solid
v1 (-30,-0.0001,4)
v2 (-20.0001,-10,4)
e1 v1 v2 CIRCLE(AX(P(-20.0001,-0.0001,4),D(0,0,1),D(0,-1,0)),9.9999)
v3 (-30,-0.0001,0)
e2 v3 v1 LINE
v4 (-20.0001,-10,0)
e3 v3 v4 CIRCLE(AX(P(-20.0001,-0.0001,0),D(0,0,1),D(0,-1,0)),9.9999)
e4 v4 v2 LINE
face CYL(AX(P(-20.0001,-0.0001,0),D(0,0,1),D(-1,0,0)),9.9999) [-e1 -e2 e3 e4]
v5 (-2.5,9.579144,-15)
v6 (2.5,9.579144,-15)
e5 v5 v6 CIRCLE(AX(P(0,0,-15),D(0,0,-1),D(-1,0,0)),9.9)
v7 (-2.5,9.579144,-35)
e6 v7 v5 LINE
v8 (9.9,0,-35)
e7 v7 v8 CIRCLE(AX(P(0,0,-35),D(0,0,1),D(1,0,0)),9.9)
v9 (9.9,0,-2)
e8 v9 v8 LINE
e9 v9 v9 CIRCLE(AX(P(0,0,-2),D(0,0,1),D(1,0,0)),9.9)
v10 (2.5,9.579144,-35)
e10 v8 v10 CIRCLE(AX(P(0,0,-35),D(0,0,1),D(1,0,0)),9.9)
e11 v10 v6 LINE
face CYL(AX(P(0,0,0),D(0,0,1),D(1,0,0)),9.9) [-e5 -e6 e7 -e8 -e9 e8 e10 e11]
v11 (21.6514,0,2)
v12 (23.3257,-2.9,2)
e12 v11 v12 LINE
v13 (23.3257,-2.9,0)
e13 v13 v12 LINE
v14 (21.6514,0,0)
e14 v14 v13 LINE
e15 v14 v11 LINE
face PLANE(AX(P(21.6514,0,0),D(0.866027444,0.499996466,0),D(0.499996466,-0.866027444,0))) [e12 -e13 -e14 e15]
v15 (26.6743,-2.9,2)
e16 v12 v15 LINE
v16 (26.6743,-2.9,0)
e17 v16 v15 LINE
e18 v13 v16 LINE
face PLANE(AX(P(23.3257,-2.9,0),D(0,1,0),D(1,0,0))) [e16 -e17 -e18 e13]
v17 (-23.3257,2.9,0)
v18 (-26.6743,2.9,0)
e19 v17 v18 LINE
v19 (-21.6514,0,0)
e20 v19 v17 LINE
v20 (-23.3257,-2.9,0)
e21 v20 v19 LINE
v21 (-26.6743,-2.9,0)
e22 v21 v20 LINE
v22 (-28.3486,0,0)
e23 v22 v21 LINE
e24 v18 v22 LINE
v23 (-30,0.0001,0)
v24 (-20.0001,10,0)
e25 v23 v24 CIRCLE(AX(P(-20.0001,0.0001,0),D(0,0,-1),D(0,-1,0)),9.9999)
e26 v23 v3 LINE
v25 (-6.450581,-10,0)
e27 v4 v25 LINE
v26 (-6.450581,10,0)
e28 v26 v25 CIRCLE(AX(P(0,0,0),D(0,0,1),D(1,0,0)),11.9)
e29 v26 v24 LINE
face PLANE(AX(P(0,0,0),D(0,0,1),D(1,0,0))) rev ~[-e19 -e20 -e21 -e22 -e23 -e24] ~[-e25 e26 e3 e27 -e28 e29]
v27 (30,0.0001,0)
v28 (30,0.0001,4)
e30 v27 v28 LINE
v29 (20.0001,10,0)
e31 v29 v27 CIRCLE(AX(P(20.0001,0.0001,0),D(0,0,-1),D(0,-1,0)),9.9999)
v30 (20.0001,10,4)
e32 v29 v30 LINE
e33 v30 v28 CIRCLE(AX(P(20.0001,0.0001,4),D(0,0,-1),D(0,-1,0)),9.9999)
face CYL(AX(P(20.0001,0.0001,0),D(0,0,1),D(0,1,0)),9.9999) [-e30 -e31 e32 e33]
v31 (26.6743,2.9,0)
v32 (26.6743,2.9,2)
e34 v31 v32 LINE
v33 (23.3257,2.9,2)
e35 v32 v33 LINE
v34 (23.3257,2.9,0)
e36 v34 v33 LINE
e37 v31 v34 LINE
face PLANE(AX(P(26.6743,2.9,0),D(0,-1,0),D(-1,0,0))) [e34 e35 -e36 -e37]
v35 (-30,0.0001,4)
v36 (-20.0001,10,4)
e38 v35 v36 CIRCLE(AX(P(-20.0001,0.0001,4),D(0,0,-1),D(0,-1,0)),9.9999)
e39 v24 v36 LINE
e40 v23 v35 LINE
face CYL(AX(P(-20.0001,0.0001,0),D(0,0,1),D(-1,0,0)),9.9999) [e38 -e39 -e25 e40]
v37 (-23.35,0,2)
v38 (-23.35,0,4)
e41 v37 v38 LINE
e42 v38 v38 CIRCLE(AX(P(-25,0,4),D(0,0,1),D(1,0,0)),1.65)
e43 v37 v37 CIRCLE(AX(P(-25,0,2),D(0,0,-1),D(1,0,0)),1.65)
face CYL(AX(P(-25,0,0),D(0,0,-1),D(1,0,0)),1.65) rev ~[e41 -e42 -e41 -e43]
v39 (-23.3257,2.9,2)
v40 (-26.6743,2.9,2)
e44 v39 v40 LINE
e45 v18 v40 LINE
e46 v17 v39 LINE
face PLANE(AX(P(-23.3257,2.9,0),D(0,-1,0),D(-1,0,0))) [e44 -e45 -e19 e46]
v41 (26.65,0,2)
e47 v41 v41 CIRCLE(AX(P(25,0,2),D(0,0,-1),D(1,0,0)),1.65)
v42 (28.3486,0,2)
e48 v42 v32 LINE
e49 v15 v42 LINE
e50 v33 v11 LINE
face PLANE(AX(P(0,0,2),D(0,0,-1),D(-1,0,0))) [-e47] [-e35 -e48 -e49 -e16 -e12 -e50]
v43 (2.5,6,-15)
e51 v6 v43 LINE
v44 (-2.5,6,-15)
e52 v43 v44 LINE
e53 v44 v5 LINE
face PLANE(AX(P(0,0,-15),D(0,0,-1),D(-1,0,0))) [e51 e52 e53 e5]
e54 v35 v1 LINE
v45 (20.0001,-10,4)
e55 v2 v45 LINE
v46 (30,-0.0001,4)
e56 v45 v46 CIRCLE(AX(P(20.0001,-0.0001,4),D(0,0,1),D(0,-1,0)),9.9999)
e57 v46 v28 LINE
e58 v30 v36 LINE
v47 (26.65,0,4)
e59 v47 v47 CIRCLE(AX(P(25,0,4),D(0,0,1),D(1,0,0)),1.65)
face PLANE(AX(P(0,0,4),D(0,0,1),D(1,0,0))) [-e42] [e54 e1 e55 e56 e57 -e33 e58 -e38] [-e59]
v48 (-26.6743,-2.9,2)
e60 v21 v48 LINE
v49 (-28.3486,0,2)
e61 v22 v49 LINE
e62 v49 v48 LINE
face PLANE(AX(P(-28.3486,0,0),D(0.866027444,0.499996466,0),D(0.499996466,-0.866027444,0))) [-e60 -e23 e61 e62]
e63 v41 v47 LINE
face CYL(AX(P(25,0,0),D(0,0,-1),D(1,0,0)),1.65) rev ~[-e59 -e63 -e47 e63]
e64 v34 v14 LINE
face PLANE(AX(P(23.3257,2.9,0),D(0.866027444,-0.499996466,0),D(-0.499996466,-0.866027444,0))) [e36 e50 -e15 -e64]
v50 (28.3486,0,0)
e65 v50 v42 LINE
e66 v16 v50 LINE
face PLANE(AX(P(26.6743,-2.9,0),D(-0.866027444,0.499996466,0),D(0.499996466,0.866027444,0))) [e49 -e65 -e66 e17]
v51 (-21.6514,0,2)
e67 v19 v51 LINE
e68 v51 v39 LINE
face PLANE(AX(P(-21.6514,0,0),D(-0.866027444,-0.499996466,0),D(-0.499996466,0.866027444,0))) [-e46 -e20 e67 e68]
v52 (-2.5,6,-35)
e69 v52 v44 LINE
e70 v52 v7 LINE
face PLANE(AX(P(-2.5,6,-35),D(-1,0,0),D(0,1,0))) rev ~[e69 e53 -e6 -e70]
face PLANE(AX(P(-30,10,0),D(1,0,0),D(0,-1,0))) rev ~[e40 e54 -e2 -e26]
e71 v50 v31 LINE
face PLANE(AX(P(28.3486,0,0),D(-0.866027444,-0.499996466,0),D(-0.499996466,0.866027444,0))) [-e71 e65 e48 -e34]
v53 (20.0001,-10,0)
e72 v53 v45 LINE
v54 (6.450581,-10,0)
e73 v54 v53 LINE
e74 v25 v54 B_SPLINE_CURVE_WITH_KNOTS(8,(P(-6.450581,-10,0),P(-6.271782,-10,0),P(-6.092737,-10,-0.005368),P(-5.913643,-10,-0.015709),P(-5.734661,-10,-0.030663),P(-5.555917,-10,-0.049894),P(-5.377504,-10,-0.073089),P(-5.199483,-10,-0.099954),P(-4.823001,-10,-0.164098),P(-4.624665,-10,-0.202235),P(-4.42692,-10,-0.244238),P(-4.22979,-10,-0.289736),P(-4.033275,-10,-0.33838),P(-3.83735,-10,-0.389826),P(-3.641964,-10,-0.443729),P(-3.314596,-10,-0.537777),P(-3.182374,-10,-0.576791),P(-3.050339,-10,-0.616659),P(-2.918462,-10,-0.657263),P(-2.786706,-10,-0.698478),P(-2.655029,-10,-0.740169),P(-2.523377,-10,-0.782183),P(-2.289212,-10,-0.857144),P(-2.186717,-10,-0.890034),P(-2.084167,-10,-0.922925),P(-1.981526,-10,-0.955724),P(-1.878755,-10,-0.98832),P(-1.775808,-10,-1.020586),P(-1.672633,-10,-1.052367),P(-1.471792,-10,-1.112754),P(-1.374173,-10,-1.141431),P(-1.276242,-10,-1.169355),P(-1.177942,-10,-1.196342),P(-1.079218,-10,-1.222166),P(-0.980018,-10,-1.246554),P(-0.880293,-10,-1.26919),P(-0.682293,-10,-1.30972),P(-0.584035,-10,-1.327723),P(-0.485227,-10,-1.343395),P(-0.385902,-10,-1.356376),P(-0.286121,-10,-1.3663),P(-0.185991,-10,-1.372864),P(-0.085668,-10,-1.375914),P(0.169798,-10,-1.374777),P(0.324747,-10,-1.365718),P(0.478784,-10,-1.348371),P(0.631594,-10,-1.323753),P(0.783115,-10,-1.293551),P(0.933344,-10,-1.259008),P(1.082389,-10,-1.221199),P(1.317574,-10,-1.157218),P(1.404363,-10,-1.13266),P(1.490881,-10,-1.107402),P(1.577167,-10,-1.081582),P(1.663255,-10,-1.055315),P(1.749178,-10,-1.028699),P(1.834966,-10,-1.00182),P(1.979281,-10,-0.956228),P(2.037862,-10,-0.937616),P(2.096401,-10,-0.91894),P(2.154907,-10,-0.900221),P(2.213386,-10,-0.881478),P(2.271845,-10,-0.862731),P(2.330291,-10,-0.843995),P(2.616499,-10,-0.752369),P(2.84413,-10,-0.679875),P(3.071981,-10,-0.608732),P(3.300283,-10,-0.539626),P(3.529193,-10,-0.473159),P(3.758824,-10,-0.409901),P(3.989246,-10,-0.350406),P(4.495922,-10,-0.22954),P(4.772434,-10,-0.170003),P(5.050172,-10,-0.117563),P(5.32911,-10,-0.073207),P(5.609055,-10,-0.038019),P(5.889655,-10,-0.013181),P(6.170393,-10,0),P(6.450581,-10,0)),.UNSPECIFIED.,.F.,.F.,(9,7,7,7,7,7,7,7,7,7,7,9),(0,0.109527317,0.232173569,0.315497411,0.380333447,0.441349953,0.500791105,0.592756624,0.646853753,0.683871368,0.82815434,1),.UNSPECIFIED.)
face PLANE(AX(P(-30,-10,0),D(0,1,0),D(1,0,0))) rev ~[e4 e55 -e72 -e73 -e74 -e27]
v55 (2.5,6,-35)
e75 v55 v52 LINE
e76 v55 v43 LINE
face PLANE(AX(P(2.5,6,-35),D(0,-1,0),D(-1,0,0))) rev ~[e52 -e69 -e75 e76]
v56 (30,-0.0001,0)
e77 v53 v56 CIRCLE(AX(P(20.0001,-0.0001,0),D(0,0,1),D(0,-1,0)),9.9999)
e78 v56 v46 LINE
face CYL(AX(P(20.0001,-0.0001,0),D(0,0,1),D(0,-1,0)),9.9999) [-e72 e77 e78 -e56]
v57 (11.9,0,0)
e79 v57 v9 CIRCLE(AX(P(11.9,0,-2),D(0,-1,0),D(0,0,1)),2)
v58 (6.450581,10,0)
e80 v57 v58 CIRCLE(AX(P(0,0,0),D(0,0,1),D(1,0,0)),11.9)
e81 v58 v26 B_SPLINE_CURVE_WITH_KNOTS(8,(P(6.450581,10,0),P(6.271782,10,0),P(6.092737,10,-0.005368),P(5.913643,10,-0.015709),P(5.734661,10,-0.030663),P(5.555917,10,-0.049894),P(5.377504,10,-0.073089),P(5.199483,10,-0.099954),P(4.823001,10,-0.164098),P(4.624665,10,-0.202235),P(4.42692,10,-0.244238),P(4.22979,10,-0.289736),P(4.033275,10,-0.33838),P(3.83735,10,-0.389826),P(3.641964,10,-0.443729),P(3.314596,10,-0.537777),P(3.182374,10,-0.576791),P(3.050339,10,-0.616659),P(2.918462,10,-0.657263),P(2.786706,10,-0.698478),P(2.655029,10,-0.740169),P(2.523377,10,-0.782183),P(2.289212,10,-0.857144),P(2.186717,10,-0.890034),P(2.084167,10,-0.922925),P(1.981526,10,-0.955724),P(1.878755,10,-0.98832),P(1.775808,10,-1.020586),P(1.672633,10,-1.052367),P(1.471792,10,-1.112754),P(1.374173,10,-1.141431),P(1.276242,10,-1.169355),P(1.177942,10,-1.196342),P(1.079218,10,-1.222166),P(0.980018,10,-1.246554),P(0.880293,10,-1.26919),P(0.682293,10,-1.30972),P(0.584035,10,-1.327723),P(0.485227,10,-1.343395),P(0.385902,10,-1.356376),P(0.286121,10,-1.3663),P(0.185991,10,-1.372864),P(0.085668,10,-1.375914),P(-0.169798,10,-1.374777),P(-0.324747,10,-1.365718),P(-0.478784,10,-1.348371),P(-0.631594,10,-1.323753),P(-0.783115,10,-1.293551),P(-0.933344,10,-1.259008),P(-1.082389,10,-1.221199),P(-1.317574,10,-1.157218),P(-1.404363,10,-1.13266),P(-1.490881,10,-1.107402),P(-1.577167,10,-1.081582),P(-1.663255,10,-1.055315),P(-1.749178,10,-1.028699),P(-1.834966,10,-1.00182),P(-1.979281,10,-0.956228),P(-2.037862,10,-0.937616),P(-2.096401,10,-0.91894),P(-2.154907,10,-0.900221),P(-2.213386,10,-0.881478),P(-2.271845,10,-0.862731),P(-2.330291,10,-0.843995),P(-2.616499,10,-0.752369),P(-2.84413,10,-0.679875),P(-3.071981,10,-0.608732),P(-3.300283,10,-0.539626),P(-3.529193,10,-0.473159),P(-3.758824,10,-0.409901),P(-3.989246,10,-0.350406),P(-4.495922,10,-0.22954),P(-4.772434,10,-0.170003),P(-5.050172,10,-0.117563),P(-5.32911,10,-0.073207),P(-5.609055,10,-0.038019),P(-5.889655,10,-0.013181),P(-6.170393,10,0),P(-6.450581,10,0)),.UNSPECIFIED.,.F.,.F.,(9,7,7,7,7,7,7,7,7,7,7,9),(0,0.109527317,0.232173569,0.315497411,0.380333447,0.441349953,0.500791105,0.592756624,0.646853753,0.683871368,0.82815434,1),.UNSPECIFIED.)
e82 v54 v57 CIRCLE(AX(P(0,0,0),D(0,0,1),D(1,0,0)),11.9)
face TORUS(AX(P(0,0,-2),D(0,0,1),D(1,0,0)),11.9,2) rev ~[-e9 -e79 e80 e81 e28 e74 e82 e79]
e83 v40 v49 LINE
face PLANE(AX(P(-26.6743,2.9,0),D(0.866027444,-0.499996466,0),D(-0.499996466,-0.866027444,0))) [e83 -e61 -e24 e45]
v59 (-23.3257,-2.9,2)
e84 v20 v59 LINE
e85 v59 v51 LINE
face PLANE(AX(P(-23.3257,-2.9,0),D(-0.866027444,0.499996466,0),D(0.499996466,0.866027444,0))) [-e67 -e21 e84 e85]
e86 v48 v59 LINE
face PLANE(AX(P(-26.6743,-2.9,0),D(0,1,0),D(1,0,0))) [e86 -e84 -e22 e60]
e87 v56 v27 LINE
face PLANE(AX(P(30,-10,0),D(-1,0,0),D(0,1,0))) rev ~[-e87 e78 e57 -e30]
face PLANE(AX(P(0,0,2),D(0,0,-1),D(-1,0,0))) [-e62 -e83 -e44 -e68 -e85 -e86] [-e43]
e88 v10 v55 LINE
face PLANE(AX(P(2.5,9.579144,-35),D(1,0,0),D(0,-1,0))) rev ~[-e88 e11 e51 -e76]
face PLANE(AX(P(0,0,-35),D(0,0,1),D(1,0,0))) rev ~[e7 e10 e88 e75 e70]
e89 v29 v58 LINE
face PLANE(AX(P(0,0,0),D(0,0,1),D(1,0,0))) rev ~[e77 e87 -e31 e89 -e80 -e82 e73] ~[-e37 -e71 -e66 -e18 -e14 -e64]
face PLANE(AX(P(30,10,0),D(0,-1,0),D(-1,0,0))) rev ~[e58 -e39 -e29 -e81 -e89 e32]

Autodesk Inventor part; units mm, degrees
ref_plane "YZ Plane" through (0, 0, 0) normal (1, 0, 0) x (0, 1, 0)
ref_plane "XZ Plane" through (0, 0, 0) normal (0, 1, 0) x (-1, 0, 0)
ref_plane "XY Plane" through (0, 0, 0) normal (0, 0, 1) x (1, 0, 0)
sketch "Sketch1" plane through (0, 0, 0) normal (0, 0, 1) x (1, 0, 0)
  line L0 (-30, -10) -> (30, -10)
  line L1 (30, -10) -> (30, 10)
  line L2 (30, 10) -> (-30, 10)
  line L3 (-30, 10) -> (-30, -10)
  line L4 (-30, -10) -> (30, 10) construction
  line L5 (30, -10) -> (-30, 10) construction
  circle A0 centre (0, 0) radius 9.9
  circle A1 centre (-25, 0) radius 1.65
  circle A2 centre (25, 0) radius 1.65
  line L6 (-25, 0) -> (25, 0) construction
  point P0 (-30, 0)
  dimension "d0" = 60
  dimension "d1" = 19.8
  dimension "d2" = 20
  dimension "d3" = 50
  dimension "d4" = 3.3
extrude "Extrusion1" add sketch "Sketch1" along normal blind 4 contours L3 L2 L1 L0 | A0
extrude "Extrusion2" add sketch "Sketch1" against normal blind 35 contours A0
fillet "Fillet1" radius 2 1 edges at (-9.9, 0, 0)
fillet "Fillet2" radius 10 4 edges at (30, 10, 2) (30, -10, 2) (-30, 10, 2) (-30, -10, 2)
sketch "Sketch2" plane through (0, 0, -35) normal (0, 0, -1) x (-1, 0, 0)
  circle A0 centre (0, 0) radius 9.9 projected
  line L0 (-2.5, 0) -> (2.5, 0)
  line L1 (2.5, 0) -> (2.5, 12)
  line L2 (2.5, 12) -> (-2.5, 12)
  line L3 (-2.5, 12) -> (-2.5, 0)
  line L4 (-2.5, 6) -> (2.5, 6)
  point P0 (0, 12)
  point P1 (2.5, 9.5791)
  point P2 (-2.5, 9.5791)
  dimension "d11" = 12
  dimension "d12" = 5
  dimension "d13" = 6
extrude "Extrusion3" cut sketch "Sketch2" against normal blind 20 contours L1 L4 L3 A0
sketch "Sketch3" plane through (0, 0, 0) normal (0, 0, -1) x (-1, 0, 0)
  arc A0 (-20, 10) -> (-20, -10) centre (-20, 0) ccw projected
  line L0 (-6.4506, -10) -> (-20, -10) projected
  arc A1 (-6.4506, 10) -> (-6.4506, -10) centre (0, 0) ccw projected
  line L1 (-20, 10) -> (-6.4506, 10) projected
  circle A2 centre (-25, 0) radius 1.65 projected
  line L2 (-28.3486, 0) -> (-26.6743, 2.9)
  line L3 (-26.6743, 2.9) -> (-23.3257, 2.9)
  line L4 (-23.3257, 2.9) -> (-21.6514, 0)
  line L5 (-21.6514, 0) -> (-23.3257, -2.9)
  line L6 (-23.3257, -2.9) -> (-26.6743, -2.9)
  line L7 (-26.6743, -2.9) -> (-28.3486, 0)
  circle A3 centre (25, 0) radius 1.65 projected
  line L8 (23.3257, 2.9) -> (26.6743, 2.9)
  line L9 (26.6743, 2.9) -> (28.3486, 0)
  line L10 (28.3486, 0) -> (26.6743, -2.9)
  line L11 (26.6743, -2.9) -> (23.3257, -2.9)
  line L12 (23.3257, -2.9) -> (21.6514, 0)
  line L13 (21.6514, 0) -> (23.3257, 2.9)
  point P0 (-25, 2.9)
  dimension "d16" = 5.8
  dimension "d17" = 5.8
extrude "Extrusion4" cut sketch "Sketch3" against normal blind 2 contours L2 L3 L4 L5 L6 L7 | L8 L9 L10 L11 L12 L13
properties part number "GIRO_1" material "Steel, Mild, Welded"
